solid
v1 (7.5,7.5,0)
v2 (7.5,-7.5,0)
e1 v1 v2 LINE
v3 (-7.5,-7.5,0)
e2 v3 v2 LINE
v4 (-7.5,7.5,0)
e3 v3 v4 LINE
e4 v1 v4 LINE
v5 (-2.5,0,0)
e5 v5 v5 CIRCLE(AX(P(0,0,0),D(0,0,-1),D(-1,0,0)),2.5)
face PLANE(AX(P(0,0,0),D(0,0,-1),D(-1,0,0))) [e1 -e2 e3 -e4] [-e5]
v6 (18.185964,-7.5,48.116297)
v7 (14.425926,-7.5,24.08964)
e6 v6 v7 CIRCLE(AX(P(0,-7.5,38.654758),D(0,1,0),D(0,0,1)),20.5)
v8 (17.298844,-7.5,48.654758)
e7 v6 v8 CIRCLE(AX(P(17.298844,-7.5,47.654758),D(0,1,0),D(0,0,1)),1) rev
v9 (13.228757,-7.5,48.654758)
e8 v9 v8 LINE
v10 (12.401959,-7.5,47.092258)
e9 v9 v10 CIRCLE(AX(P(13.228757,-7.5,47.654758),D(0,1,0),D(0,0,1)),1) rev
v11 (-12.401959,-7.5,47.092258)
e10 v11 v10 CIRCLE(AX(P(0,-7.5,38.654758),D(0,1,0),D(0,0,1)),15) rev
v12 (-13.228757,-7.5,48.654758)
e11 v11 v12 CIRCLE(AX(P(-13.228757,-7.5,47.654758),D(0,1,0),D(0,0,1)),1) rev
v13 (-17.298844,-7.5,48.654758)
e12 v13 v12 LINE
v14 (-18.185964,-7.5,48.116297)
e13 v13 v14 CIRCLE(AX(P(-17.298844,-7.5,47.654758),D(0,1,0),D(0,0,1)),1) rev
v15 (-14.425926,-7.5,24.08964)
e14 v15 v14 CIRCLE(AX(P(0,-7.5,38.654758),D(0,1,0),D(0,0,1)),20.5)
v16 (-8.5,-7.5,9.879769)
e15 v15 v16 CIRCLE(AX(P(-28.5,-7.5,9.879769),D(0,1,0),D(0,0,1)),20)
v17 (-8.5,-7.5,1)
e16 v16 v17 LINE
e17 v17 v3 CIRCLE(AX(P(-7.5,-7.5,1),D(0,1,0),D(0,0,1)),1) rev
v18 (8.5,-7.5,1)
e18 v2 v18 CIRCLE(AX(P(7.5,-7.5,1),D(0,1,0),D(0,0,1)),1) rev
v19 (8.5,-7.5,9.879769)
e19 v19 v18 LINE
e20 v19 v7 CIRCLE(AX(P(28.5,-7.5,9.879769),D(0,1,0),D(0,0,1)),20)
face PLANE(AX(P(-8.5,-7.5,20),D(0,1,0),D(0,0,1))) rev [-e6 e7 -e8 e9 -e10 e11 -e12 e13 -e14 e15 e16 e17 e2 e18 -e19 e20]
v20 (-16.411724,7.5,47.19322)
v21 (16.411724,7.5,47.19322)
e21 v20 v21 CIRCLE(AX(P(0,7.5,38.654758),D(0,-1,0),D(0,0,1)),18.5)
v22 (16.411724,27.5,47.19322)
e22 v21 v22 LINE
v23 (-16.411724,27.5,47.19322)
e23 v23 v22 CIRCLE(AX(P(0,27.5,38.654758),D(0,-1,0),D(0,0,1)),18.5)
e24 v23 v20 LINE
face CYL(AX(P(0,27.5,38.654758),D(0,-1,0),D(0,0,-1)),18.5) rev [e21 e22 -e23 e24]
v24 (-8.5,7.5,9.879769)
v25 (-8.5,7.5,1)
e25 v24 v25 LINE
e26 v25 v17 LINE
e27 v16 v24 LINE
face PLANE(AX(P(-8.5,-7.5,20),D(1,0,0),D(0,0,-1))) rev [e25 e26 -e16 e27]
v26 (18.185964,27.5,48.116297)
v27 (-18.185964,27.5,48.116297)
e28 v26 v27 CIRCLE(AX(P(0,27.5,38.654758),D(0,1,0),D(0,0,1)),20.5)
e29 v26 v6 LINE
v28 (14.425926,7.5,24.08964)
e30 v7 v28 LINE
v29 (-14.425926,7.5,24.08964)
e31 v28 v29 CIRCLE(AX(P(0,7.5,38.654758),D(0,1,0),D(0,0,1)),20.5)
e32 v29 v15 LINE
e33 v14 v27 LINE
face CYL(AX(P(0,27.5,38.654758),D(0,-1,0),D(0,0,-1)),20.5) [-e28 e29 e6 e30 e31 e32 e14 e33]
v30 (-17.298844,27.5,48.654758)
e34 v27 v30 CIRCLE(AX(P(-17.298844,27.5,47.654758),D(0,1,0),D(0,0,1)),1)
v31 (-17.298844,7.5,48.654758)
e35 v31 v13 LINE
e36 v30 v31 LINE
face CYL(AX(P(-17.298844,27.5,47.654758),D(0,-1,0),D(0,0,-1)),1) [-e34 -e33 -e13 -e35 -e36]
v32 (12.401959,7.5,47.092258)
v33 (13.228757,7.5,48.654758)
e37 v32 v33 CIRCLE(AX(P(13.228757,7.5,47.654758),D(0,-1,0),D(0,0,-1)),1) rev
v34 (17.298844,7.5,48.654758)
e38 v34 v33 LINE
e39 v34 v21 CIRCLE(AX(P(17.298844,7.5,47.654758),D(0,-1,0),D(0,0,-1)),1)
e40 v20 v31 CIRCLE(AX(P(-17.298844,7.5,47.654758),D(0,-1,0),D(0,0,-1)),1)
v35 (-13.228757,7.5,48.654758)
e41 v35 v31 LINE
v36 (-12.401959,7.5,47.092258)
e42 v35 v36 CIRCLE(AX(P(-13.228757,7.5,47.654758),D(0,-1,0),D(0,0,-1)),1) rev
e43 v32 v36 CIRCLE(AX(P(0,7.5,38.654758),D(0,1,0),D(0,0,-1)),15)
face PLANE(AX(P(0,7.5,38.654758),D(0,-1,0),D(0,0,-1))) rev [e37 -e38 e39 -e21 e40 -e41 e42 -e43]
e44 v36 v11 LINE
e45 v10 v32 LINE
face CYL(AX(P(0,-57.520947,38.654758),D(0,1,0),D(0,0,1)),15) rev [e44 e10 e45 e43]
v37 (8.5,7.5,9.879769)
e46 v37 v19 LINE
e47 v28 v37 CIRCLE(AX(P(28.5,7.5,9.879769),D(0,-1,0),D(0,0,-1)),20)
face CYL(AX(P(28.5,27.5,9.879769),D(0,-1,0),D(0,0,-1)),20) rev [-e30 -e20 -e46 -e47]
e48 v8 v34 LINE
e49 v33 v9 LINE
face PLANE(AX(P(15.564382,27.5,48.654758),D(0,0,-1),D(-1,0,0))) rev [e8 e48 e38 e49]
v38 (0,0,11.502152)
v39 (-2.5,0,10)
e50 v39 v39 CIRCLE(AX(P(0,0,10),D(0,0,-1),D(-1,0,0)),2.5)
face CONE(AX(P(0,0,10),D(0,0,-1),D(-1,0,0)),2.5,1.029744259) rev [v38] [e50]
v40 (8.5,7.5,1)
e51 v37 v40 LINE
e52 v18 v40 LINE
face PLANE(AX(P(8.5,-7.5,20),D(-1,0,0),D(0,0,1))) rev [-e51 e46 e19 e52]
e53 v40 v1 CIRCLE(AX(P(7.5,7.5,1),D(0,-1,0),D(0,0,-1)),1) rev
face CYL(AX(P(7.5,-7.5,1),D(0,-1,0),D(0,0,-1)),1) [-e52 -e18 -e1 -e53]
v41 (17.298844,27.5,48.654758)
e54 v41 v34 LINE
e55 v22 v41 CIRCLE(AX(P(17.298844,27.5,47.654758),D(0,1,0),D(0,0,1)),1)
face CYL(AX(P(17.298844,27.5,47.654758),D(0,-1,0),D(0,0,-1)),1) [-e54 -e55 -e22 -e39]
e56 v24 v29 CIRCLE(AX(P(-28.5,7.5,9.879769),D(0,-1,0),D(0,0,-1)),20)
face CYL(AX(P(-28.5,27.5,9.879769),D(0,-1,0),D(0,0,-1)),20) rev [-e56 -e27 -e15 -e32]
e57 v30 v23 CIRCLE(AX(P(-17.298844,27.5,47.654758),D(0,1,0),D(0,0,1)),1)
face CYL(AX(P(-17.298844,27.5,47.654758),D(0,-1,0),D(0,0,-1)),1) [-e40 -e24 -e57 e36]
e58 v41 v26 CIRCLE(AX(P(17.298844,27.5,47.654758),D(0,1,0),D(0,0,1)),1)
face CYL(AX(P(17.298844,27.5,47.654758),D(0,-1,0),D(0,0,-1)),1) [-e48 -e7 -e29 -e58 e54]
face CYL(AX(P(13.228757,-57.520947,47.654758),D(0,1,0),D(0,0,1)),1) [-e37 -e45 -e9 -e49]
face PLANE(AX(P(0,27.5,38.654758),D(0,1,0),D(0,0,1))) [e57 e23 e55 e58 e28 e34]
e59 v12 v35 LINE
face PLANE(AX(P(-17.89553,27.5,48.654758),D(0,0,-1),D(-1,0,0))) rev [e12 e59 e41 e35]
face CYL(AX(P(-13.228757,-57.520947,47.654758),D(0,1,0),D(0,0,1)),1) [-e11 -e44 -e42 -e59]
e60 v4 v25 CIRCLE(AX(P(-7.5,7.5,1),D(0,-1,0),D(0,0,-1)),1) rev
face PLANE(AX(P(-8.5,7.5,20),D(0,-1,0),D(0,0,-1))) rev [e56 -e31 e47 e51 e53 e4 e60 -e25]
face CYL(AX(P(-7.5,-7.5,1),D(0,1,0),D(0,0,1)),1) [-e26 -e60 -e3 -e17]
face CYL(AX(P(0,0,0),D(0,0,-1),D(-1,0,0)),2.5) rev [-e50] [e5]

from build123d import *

# Parameters (mm, degrees)
ESQUISSE1_W                    = 17
ESQUISSE1_H                    = 15
BOSS_EXTRU_1_DEPTH             = 20
TROUS_DE_CENTRAGE_5_0MM1_D     = 5
TROUS_DE_CENTRAGE_5_0MM1_DEPTH = 10
TROUS_DE_CENTRAGE_5_0MM1_TIP   = 1.5021515475689007
BOSS_EXTRU_2_DEPTH             = 20
BOSS_EXTRU_3_START             = 15
BOSS_EXTRU_3_DEPTH             = 15
CONG_1_R                       = 19.999999999999996
CONG_2_R                       = 1


with BuildPart() as part:
    # Esquisse1 → Boss.-Extru.1 (new body)
    with BuildSketch(Plane.XY):
        Rectangle(ESQUISSE1_W, ESQUISSE1_H)
    extrude(amount=BOSS_EXTRU_1_DEPTH)

    # Trous de centrage Ø5.0mm1
    with Locations(Plane(origin=(0, 0, 0), x_dir=(-1, 0, 0), z_dir=(0, 0, -1))):
        with Locations((0, 0)):
            Hole(TROUS_DE_CENTRAGE_5_0MM1_D / 2, depth=TROUS_DE_CENTRAGE_5_0MM1_DEPTH)
            with Locations((0, 0, -(TROUS_DE_CENTRAGE_5_0MM1_DEPTH + TROUS_DE_CENTRAGE_5_0MM1_TIP / 2))):  # 118° drill point
                Cone(0, TROUS_DE_CENTRAGE_5_0MM1_D / 2, TROUS_DE_CENTRAGE_5_0MM1_TIP, mode=Mode.SUBTRACT)

    # Esquisse4 → Boss.-Extru.2 (add)
    with BuildSketch(Plane(origin=(0, 7.499999999999998, 0), x_dir=(1, 0, 0), z_dir=(0, 1, 0))):
        with BuildLine():
            Line((-17.89553016817328, -48.65475810617763), (-15.56438241627338, -48.65475810617763))
            ThreePointArc((-15.56438241627338, -48.65475810617763), (-6e-16, -20.15475810617762), (15.564382416273377, -48.65475810617763))
            Line((15.564382416273377, -48.65475810617763), (17.895530168173273, -48.65475810617763))
            ThreePointArc((17.895530168173273, -48.65475810617763), (-4.8e-16, -18.154758106177628), (-17.89553016817328, -48.65475810617763))
        make_face()
    extrude(amount=BOSS_EXTRU_2_DEPTH)

    # Esquisse5 → Boss.-Extru.3 (add)
    with BuildSketch(Plane.XZ.offset(-7.499999999999998).offset(BOSS_EXTRU_3_START)):
        with BuildLine():
            Line((-15.564382416273382, 48.65475810617763), (-11.180339887498954, 48.654758106177624))
            ThreePointArc((-11.180339887498954, 48.654758106177624), (-4.49e-15, 23.65475810617762), (11.180339887498954, 48.654758106177624))
            Line((11.180339887498954, 48.654758106177624), (15.564382416273377, 48.65475810617763))
            Line((15.564382416273377, 48.65475810617763), (17.895530168173273, 48.65475810617763))
            ThreePointArc((17.895530168173273, 48.65475810617763), (19.479599424670532, 32.26764559312642), (8.499999999999998, 20))
            Line((8.499999999999998, 20), (-8.49999999999999, 20))
            ThreePointArc((-8.49999999999999, 20), (-19.47959942467054, 32.26764559312641), (-17.89553016817328, 48.65475810617763))
            Line((-17.89553016817328, 48.65475810617763), (-15.564382416273382, 48.65475810617763))
        make_face()
    extrude(amount=-BOSS_EXTRU_3_DEPTH)

    # Congé1
    cong_1_edges = [part.edges().sort_by_distance(p)[0] for p in [
        (-8.500000000000002, -1.78e-15, 20),
        (8.499999999999998, -1.78e-15, 20),
    ]]
    fillet(cong_1_edges, radius=CONG_1_R)

    # Congé2
    cong_2_edges = [part.edges().sort_by_distance(p)[0] for p in [
        (-17.89553016817328, 9.999999999999998, 48.654758106177624),
        (17.895530168173273, 10, 48.65475810617764),
        (15.564382416273379, 17.5, 48.65475810617763),
        (-15.564382416273382, 17.5, 48.65475810617763),
        (11.180339887498956, -1.78e-15, 48.654758106177624),
        (-11.180339887498954, -1.78e-15, 48.654758106177624),
        (-8.500000000000002, -1.78e-15, 0),
        (8.499999999999998, -1.78e-15, 0),
    ]]
    fillet(cong_2_edges, radius=CONG_2_R - 0.0001)  # a hair under: the kernel refuses the full size


solid = part.part
